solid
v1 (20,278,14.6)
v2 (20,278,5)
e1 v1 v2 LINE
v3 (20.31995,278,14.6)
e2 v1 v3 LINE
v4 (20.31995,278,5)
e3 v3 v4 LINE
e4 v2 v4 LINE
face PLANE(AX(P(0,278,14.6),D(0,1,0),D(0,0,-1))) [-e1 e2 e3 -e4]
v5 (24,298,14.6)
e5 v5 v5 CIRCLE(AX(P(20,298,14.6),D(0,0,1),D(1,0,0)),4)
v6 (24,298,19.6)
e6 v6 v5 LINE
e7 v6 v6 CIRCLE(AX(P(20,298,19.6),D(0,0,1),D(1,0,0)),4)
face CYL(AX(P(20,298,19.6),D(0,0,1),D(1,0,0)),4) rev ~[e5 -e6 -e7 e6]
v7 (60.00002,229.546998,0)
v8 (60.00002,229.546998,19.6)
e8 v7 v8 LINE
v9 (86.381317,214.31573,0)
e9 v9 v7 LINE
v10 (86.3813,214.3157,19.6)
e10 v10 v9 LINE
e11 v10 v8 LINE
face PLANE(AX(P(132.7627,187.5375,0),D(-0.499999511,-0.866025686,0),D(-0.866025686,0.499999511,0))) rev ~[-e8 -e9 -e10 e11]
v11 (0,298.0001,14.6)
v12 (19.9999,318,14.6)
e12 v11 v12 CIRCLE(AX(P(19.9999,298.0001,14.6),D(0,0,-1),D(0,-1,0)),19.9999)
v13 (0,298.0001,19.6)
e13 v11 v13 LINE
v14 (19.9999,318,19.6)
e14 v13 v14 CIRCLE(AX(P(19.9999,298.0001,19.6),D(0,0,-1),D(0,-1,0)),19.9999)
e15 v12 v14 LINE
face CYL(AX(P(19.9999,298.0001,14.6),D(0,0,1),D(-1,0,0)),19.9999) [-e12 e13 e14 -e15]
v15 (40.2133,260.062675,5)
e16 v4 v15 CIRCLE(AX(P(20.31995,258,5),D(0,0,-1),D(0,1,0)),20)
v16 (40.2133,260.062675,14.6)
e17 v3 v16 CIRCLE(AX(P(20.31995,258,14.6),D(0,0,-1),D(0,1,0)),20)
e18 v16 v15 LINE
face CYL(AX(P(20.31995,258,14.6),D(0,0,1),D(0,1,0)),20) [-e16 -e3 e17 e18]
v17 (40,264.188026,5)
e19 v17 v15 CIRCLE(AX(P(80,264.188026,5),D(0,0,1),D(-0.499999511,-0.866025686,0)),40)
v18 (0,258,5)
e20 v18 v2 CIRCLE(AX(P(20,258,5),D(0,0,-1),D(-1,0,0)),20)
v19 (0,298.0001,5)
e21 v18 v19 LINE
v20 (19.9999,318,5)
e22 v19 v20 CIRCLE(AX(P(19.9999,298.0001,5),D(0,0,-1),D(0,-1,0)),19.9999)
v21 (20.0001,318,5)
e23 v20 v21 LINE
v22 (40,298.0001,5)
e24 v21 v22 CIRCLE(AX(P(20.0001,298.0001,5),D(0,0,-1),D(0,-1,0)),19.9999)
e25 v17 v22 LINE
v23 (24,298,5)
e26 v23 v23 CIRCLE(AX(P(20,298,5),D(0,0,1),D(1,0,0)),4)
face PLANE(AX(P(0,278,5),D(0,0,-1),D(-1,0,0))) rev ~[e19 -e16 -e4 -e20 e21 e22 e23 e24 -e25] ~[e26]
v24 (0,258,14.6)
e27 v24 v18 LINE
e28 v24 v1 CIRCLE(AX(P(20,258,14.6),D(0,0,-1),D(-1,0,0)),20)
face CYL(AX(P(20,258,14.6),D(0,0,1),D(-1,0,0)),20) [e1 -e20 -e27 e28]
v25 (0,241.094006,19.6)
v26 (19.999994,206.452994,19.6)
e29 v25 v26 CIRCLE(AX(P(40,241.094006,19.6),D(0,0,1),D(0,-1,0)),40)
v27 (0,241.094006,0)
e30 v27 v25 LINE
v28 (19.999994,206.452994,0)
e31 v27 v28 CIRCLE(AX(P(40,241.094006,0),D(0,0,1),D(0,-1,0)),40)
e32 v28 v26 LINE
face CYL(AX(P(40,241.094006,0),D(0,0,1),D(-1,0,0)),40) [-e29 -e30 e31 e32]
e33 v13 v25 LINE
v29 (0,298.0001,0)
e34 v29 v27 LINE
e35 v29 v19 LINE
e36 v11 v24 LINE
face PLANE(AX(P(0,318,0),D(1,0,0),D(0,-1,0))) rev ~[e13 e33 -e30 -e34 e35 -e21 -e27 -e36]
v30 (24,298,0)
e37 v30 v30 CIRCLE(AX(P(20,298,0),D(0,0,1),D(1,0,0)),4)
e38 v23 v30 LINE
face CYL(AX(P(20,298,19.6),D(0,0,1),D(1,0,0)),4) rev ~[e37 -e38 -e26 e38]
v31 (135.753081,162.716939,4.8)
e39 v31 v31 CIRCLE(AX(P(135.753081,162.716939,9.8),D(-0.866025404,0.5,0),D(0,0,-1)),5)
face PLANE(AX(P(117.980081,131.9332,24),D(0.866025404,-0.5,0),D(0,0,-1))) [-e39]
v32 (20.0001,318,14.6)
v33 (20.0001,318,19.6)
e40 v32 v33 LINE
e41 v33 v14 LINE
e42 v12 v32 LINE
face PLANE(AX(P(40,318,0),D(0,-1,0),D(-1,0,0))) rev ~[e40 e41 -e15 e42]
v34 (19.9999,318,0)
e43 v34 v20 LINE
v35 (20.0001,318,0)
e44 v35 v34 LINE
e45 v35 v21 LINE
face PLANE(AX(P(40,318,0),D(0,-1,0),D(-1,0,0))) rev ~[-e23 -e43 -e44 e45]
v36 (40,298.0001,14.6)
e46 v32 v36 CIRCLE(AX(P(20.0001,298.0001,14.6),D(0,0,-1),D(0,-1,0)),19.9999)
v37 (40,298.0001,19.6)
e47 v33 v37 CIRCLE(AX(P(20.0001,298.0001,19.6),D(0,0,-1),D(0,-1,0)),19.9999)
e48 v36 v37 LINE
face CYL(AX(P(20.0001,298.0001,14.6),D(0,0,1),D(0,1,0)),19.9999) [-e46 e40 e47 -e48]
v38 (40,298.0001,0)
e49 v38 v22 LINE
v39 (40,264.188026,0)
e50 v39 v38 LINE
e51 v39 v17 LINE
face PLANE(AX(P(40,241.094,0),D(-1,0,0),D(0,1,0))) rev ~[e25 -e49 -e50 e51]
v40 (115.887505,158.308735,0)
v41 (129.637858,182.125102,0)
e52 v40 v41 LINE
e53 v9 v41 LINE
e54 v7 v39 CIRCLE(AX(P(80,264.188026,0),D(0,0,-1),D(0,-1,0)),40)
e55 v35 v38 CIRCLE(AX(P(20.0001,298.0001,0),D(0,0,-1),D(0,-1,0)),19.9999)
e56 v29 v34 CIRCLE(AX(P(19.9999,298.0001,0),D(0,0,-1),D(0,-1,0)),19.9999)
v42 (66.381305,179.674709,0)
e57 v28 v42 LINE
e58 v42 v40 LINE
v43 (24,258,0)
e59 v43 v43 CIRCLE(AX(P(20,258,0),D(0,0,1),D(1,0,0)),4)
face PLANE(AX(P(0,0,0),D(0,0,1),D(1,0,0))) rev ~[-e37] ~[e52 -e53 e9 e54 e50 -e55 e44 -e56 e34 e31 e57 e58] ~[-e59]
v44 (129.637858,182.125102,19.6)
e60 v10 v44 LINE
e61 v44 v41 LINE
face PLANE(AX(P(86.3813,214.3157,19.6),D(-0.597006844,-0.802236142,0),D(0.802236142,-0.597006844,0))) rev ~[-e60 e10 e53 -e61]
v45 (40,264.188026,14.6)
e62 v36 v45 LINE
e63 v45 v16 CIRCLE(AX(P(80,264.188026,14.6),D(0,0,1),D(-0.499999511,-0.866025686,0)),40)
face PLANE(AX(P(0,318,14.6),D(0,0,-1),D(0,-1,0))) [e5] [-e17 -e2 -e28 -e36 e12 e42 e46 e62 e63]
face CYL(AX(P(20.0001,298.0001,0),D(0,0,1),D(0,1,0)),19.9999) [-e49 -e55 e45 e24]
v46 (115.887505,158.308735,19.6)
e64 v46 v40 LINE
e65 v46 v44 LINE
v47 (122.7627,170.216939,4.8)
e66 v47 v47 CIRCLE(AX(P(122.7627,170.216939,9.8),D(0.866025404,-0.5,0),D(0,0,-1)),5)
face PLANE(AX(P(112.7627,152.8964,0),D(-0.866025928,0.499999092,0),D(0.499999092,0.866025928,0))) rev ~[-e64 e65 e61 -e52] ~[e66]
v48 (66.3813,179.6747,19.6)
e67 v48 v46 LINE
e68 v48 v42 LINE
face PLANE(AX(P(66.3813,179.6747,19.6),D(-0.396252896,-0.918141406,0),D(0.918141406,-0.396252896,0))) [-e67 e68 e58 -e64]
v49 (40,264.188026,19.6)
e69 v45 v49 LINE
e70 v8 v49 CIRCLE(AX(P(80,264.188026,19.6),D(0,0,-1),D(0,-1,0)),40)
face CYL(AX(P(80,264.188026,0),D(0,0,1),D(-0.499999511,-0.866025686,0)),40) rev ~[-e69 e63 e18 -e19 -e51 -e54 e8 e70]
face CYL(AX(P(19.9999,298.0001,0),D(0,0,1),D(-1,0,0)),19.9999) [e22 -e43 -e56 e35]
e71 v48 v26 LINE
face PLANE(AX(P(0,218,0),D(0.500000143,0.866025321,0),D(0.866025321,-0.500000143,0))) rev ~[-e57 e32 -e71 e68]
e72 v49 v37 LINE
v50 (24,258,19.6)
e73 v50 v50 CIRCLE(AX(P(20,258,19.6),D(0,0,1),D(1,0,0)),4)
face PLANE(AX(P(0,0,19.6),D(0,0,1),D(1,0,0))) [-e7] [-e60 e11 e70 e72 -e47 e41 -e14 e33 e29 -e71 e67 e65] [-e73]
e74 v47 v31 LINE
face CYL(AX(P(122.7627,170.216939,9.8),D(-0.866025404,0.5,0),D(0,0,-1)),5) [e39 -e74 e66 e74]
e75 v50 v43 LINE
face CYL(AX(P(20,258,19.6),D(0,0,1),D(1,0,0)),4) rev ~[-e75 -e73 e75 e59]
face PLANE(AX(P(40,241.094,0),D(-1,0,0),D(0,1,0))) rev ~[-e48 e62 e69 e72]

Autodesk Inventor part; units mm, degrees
ref_plane "YZ Plane" through (0, 0, 0) normal (1, 0, 0) x (0, 1, 0)
ref_plane "XZ Plane" through (0, 0, 0) normal (0, 1, 0) x (-1, 0, 0)
ref_plane "XY Plane" through (0, 0, 0) normal (0, 0, 1) x (1, 0, 0)
sketch "スケッチ1" plane through (0, 0, 0) normal (0, 0, 1) x (1, 0, 0)
  line L0 (0, 0) -> (40, 0)
  line L1 (40, 0) -> (40, 318)
  line L2 (40, 318) -> (0, 318)
  line L3 (0, 318) -> (0, 0)
  line L4 (0, 218) -> (112.7627, 152.8964)
  line L5 (112.7627, 152.8964) -> (132.7627, 187.5375)
  line L6 (132.7627, 187.5375) -> (40, 241.094)
  point P0 (40, 218)
  point P1 (40, 194.906)
  point P2 (20, 318)
  point P3 (122.7627, 170.2169)
  point P4 (20, 258)
  dimension "d0" = 40
  dimension "d1" = 318
  dimension "d69" = 40
  dimension "d70" = 60
  dimension "d91" = 20
  dimension "d92" = 100
  dimension "d93" = 180
  dimension "d96" = 20
  dimension "d97" = 60
extrude "押し出し1" add sketch "スケッチ1" along normal blind 19.6 contours L3 L2 L1 L4 | L1 L6 L5 L4
sketch "スケッチ6" plane through (0, 0, 19.6) normal (0, 0, 1) x (1, 0, 0)
  circle A0 centre (20, 258) radius 4
  line L0 (40, 318) -> (0, 318) projected
  line L1 (40, 241.094) -> (40, 318) projected
  circle A1 centre (20, 20) radius 1.2295
  circle A2 centre (20, 10) radius 1.2295
  line L2 (0, 0) -> (40, 0) projected
  circle A3 centre (20, 298) radius 4
  point P0 (20, 318)
  point P1 (40, 190.8114)
  point P2 (30, 0)
  dimension "d42" = 8
  dimension "d44" = 20
  dimension "d45" = 2.459
  dimension "d46" = 2.459
  dimension "d47" = 10
  dimension "d48" = 10
  dimension "d49" = 20
  dimension "d50" = 20
  dimension "d53" = 8
  dimension "d54" = 20
  dimension "d55" = 40
  dimension "d56" = 20
extrude "押し出し4" cut sketch "スケッチ6" against normal through all
sketch "スケッチ8" plane through (0, 0, 0) normal (-1, 0, 0) x (0, 0, 1)
  line L0 (0, 318) -> (19.6, 318) projected
  line L1 (5, 318) -> (14.6, 318)
  line L2 (14.6, 318) -> (14.6, 278)
  line L3 (14.6, 278) -> (5, 278)
  line L4 (5, 278) -> (5, 318)
  line L5 (0, 318) -> (0, 0) projected
  dimension "d57" = 5
  dimension "d58" = 9.6
  dimension "d59" = 40
  dimension "d98" = 19.6
extrude "押し出し5" cut sketch "スケッチ8" against normal through all
fillet "フィレット1" radius 20 4 edges at (40, 318, 17.1) (40, 318, 2.5) (0, 318, 2.5) (0, 318, 17.1)
fillet "フィレット2" radius 40 2 edges at (0, 218, 9.8) (40, 241.094, 9.8)
sketch "スケッチ9" plane through (0, 0, 19.6) normal (0, 0, 1) x (1, 0, 0)
  line L0 (20, 206.453) -> (112.7627, 152.8964) projected
  line L1 (132.7627, 187.5375) -> (60, 229.547) projected
  line L2 (112.7627, 152.8964) -> (132.7627, 187.5375) projected
  line L3 (132.7627, 187.5375) -> (112.7627, 152.8964)
  line L4 (66.3813, 179.6747) -> (112.7627, 152.8964)
  line L5 (132.7627, 187.5375) -> (166.773, 167.9016)
  line L6 (115.1204, 126.9801) -> (133.5174, 158.8446)
  line L7 (141.7531, 173.1092) -> (128.7627, 180.6092)
  line L8 (112.7627, 152.8964) -> (20, 206.453)
  line L9 (132.7627, 187.5375) -> (60, 229.547)
  line L10 (115.1204, 126.9801) -> (125.7531, 145.3964)
  line L11 (133.5174, 158.8446) -> (145.7531, 180.0375)
  line L12 (116.7627, 159.8246) -> (129.7531, 152.3246)
  line L13 (66.3813, 179.6747) -> (129.7531, 152.3246)
  line L14 (66.3813, 179.6747) -> (86.3813, 214.3157)
  line L15 (86.3813, 214.3157) -> (141.7531, 173.1092)
  point P0 (0, 0)
  point P1 (254.4532, 80.329)
  point P2 (128.7627, 180.6092)
  point P3 (123.2579, 156.0746)
  point P4 (86.3813, 214.3157)
  point P5 (40, 194.906)
  point P6 (115.8875, 158.3088)
  point P7 (129.6379, 182.1251)
  dimension "d80" = 24
  dimension "d81" = 40
  dimension "d83" = 15
  dimension "d84" = 8
  dimension "d90" = 24
extrude "押し出し6" cut sketch "スケッチ9" against normal through all contours L13 L2 L0 | L1 L2 L15
sketch "スケッチ11" plane through (104.9897, 139.4332, 24) normal (0.8660254, -0.5, 0) x (0, 0, -1)
  line L0 (4.4, 21.7957) -> (4.4, 49.2964) projected
  line L1 (24, 21.7957) -> (24, 49.2964) projected
  line L2 (0, 24) -> (24, 24)
  line L3 (24, 24) -> (24, 0)
  line L4 (24, 0) -> (0, 0)
  line L5 (0, 0) -> (0, 24)
  line L6 (17, 17) -> (7, 17)
  line L7 (7, 17) -> (7, 7)
  line L8 (7, 7) -> (17, 7)
  line L9 (17, 7) -> (17, 17)
  line L10 (4.4, 35.546) -> (24, 35.546) projected
  circle A0 centre (14.2, 35.546) radius 5
  point P0 (24, -173.2475)
  point P1 (24, 24)
  point P2 (0, 15.546)
  point P3 (24, 15.546)
  dimension "d85" = 10
  dimension "d88" = 10
extrude "押し出し7" add sketch "スケッチ11" along normal blind 15 contours A0 L10 | L10 A0
fillet "フィレット4" radius 20 2 edges at (0, 278, 9.8) (40, 278, 9.8)
equation "\"d45\" = d46"
equation "\"d48\" = d47"
equation "\"d50\" = d49"
properties part number "legparts_06(seven)" material "ABS プラスチック"
